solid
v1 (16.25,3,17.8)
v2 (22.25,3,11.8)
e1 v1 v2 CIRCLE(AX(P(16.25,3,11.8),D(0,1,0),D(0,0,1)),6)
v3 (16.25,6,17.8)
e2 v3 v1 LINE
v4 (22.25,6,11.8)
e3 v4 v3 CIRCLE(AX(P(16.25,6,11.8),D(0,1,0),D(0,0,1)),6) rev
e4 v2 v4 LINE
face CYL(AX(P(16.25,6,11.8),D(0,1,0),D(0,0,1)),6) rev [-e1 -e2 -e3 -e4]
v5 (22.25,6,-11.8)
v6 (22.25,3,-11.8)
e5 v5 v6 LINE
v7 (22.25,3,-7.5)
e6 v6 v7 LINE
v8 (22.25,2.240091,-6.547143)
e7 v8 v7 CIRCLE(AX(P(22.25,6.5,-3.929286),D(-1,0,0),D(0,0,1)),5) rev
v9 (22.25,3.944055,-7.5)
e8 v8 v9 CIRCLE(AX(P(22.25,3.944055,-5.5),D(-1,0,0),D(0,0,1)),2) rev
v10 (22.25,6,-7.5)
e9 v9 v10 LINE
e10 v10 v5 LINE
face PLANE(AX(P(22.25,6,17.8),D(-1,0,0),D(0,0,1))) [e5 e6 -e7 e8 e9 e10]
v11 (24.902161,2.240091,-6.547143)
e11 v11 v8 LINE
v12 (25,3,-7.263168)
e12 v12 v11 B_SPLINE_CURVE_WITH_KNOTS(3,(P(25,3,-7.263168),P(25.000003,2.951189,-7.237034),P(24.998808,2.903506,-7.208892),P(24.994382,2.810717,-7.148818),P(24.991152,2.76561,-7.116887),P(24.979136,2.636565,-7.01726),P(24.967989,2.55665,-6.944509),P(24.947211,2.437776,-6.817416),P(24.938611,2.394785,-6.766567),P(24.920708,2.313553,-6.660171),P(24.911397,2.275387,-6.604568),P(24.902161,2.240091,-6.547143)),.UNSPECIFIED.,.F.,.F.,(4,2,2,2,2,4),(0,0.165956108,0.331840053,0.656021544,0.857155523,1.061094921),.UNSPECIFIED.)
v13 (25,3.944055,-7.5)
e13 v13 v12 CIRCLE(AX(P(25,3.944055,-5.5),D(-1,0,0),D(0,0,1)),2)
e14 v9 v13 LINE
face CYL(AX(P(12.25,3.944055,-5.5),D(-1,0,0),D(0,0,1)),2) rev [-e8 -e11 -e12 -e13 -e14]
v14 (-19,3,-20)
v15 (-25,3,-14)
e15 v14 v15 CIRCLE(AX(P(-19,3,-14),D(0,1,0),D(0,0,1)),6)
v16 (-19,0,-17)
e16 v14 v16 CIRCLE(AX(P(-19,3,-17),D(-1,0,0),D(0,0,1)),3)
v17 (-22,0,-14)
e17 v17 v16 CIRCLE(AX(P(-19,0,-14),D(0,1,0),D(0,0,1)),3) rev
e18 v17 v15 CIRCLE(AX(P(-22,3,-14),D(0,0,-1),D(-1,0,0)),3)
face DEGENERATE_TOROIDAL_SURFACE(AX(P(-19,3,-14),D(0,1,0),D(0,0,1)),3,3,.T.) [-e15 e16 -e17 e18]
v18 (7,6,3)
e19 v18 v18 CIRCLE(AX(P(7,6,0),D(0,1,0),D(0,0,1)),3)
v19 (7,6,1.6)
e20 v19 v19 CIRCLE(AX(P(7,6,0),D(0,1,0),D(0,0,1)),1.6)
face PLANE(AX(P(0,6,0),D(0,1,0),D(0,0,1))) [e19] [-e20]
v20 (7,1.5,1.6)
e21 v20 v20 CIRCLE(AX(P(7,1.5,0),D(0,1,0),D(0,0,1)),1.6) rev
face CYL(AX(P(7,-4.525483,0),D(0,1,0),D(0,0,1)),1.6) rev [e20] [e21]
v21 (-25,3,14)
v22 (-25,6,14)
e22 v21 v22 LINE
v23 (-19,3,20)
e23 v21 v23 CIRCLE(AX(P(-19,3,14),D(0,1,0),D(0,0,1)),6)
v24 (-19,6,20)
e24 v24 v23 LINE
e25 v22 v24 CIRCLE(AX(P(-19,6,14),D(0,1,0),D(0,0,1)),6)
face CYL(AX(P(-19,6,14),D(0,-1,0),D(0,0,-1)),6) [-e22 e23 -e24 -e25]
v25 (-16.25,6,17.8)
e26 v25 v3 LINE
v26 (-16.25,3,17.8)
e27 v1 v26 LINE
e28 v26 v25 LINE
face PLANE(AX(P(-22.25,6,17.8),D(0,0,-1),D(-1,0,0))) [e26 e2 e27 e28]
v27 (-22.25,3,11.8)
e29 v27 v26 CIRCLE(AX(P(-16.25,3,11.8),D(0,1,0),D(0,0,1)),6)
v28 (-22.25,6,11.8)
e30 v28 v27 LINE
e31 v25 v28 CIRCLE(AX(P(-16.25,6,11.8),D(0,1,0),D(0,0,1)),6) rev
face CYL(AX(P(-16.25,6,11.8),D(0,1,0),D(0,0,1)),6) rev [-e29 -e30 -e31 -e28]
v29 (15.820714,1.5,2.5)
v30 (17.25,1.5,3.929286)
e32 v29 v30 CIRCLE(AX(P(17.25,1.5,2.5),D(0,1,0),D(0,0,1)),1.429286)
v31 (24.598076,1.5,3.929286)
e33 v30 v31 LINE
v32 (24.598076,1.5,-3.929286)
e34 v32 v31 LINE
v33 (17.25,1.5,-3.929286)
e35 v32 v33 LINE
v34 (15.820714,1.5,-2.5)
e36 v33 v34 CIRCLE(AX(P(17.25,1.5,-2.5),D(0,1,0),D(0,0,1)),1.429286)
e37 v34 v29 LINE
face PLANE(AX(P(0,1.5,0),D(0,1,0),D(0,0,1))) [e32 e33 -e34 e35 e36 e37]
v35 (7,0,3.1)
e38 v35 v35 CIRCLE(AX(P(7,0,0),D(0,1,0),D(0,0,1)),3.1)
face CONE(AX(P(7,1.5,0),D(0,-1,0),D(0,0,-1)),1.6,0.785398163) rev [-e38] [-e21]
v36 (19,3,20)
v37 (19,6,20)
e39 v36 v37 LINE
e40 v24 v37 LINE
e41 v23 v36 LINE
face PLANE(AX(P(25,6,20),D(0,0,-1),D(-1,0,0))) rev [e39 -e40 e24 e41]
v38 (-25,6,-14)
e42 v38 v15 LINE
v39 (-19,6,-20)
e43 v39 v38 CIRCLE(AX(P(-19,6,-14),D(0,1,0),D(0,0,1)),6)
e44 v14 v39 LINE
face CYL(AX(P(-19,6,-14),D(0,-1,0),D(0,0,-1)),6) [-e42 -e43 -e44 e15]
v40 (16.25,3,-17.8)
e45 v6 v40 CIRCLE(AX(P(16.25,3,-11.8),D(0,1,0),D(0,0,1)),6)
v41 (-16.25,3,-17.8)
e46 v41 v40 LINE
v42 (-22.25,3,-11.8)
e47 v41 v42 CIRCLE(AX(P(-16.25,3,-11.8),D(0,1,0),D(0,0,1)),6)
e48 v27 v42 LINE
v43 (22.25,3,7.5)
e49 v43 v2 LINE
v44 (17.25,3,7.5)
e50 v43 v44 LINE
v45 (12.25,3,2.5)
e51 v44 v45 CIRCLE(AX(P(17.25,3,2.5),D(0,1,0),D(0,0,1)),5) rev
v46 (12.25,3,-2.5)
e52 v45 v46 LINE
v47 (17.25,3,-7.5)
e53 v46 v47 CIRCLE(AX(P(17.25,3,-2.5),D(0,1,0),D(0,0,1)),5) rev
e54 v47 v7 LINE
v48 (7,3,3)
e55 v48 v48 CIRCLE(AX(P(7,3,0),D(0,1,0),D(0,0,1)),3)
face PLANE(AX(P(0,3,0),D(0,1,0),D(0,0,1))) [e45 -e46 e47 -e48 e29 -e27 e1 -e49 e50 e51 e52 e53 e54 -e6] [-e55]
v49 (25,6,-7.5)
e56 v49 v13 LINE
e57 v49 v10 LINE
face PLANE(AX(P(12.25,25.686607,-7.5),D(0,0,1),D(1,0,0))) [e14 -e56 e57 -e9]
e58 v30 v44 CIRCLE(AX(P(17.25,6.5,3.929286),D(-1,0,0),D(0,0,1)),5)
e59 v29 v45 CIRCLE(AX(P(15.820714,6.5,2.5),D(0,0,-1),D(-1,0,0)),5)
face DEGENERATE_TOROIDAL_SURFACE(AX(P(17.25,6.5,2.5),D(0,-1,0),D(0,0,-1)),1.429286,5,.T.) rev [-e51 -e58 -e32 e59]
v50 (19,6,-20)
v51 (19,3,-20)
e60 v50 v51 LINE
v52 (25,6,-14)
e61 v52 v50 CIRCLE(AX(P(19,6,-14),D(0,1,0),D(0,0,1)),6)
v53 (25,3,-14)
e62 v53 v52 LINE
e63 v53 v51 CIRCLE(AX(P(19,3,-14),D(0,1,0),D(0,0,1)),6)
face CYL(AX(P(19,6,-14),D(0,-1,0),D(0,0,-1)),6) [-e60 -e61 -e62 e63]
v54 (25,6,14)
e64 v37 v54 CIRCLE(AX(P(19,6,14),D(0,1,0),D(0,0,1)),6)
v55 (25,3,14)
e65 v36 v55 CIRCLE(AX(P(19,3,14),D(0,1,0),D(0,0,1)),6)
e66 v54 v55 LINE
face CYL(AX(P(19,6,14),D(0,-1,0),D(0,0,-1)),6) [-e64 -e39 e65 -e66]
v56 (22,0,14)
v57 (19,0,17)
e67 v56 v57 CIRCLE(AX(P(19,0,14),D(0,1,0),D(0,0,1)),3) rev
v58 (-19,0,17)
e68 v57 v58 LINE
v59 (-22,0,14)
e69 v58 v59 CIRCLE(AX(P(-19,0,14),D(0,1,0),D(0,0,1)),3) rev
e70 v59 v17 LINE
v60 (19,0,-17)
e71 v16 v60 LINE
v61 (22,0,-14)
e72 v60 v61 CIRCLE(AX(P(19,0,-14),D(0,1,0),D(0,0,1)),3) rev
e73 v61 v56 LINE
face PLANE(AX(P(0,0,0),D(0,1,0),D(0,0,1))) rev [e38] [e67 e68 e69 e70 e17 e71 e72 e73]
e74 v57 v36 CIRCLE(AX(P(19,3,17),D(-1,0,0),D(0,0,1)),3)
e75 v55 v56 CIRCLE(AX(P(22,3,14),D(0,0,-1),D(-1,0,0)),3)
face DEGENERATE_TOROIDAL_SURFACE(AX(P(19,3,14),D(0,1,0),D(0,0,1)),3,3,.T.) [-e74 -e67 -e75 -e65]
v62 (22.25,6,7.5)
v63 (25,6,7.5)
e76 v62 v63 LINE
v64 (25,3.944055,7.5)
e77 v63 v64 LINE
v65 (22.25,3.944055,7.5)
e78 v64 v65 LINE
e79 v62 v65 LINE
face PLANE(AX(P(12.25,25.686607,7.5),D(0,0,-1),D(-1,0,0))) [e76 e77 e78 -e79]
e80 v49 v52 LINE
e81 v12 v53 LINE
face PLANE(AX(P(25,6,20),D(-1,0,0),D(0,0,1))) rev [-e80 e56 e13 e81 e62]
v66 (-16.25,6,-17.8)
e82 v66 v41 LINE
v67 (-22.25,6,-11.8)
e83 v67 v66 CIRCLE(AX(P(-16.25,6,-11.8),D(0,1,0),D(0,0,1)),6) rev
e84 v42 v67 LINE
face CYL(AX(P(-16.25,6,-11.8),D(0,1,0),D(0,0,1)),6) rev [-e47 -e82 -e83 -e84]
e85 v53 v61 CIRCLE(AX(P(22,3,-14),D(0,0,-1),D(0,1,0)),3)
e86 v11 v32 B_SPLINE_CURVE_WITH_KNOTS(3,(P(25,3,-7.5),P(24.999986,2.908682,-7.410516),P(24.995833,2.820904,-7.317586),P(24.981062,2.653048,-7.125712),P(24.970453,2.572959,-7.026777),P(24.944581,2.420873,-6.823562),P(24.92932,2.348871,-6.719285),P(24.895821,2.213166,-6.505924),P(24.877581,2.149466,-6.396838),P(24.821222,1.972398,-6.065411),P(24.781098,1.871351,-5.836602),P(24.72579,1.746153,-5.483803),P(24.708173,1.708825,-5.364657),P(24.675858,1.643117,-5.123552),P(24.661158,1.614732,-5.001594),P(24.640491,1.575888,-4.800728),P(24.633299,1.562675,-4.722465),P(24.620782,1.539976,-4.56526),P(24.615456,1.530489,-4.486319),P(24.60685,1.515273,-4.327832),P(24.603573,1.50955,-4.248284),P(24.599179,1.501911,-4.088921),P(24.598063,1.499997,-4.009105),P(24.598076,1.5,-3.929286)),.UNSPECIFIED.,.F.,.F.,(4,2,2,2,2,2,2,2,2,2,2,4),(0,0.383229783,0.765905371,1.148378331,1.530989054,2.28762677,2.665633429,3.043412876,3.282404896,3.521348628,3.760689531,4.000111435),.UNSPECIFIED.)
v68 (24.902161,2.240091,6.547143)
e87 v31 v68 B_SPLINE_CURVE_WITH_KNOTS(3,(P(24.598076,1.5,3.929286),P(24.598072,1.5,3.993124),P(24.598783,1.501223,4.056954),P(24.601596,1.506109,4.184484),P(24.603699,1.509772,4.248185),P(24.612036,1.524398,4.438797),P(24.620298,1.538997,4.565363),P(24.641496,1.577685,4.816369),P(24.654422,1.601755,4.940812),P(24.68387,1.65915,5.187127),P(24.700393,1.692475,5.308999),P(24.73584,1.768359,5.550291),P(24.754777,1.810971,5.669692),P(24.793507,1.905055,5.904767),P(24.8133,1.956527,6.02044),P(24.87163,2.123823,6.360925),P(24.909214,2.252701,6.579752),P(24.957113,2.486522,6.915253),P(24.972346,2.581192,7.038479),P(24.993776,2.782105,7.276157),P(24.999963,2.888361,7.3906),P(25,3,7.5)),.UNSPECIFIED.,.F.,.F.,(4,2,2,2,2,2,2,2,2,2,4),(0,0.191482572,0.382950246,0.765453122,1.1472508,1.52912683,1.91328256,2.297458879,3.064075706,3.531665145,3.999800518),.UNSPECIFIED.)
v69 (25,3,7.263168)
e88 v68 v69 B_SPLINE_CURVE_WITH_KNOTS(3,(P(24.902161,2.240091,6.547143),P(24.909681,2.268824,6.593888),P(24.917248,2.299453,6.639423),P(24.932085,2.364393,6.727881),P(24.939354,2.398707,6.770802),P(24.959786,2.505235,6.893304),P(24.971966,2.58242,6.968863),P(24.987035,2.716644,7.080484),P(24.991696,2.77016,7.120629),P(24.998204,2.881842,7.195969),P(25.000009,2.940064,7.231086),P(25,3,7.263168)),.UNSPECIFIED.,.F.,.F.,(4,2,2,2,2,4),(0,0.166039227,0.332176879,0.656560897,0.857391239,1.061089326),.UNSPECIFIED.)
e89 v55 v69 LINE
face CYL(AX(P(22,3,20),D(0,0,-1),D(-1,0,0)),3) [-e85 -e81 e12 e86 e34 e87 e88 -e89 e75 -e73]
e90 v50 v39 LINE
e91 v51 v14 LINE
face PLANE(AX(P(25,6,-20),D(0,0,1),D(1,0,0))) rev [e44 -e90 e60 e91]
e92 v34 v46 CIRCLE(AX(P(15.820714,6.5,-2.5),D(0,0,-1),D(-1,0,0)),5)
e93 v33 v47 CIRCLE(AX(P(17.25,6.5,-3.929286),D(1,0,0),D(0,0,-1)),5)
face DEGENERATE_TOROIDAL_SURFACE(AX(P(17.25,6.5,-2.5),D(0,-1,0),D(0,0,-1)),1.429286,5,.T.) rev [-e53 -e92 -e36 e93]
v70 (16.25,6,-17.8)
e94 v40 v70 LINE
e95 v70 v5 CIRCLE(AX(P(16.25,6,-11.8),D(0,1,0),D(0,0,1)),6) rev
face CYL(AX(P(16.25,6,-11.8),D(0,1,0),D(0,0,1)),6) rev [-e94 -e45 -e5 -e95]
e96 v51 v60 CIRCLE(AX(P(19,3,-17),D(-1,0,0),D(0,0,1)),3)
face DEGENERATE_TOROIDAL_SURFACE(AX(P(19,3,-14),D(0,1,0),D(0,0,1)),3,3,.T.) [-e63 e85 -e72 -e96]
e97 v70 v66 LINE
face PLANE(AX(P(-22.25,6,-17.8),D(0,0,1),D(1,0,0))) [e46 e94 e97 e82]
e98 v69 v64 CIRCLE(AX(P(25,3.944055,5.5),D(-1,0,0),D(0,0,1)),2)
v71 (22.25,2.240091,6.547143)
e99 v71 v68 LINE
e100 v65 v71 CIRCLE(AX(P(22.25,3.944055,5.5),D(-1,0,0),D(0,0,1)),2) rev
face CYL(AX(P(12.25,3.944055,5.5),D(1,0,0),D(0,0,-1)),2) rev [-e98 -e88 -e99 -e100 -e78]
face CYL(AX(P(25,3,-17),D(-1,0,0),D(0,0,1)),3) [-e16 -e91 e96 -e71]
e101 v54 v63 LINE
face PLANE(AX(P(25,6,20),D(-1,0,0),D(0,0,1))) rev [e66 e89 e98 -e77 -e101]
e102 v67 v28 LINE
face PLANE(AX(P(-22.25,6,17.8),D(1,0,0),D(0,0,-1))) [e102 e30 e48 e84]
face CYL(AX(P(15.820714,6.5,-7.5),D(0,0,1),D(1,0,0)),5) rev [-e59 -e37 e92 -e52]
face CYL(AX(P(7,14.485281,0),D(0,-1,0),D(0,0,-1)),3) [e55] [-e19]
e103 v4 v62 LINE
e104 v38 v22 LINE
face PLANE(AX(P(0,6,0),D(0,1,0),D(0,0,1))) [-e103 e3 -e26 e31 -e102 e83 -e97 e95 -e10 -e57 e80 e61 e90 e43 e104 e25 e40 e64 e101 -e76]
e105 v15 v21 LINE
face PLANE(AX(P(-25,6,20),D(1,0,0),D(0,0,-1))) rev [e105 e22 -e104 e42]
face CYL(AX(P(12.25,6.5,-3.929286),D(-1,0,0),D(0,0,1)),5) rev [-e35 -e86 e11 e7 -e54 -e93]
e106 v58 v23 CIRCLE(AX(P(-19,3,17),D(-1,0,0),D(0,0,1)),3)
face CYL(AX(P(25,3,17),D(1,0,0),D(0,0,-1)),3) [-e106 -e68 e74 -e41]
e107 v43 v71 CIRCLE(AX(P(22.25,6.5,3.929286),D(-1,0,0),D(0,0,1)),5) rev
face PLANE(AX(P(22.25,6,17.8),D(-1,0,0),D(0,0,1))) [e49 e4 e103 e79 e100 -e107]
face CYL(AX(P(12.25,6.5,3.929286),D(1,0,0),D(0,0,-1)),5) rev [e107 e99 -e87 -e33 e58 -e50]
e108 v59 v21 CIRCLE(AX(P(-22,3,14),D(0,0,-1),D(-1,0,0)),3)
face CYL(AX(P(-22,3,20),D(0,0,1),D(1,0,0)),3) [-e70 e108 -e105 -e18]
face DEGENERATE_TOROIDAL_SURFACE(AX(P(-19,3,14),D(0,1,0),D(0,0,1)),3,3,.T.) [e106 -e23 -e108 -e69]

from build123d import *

# Parameters (mm, degrees)
SKETCH1_W           = 50
SKETCH1_H           = 40
SKETCH1_W_2         = 44.5
SKETCH1_H_2         = 35.6
BOSS_EXTRUDE1_DEPTH = 6
SKETCH2_W           = 44.5
SKETCH2_H           = 35.6
BOSS_EXTRUDE2_DEPTH = 3
SKETCH3_R           = 3
BOSS_EXTRUDE3_DEPTH = 3
SKETCH4_R           = 1.6
CUT_EXTRUDE1_DEPTH  = 6
FILLET1_R           = 6
CHAMFER1_SIZE       = 1.5
FILLET2_R           = 3
CUT_EXTRUDE2_START  = -1.5
SKETCH5_W           = 12.75
SKETCH5_H           = 15
CUT_EXTRUDE2_DEPTH  = 4.5
FILLET3_R           = 5
FILLET4_R           = 5
FILLET5_R           = 2


with BuildPart() as part:
    # Sketch1 → Boss-Extrude1 (new body)
    with BuildSketch(Plane(origin=(0, 0, 0), x_dir=(1, 0, 0), z_dir=(0, 1, 0))):
        Rectangle(SKETCH1_W, SKETCH1_H)
        Rectangle(SKETCH1_W_2, SKETCH1_H_2, mode=Mode.SUBTRACT)
    extrude(amount=BOSS_EXTRUDE1_DEPTH)

    # Sketch2 → Boss-Extrude2 (add)
    with BuildSketch(Plane(origin=(0, 0, 0), x_dir=(-1, 0, 0), z_dir=(0, -1, 0))):
        Rectangle(SKETCH2_W, SKETCH2_H)
    extrude(amount=-BOSS_EXTRUDE2_DEPTH)

    # Sketch3 → Boss-Extrude3 (add)
    with BuildSketch(Plane(origin=(0, 3, 0), x_dir=(1, 0, 0), z_dir=(0, 1, 0))):
        with Locations(Location((7, 0, 0), (0, 0, 270))):
            Circle(SKETCH3_R)
    extrude(amount=BOSS_EXTRUDE3_DEPTH)

    # Sketch4 → Cut-Extrude1 (cut)
    with BuildSketch(Plane(origin=(0, 6, 0), x_dir=(1, 0, 0), z_dir=(0, 1, 0))):
        with Locations(Location((7, 0, 0), (0, 0, 270))):
            Circle(SKETCH4_R)
    extrude(amount=-CUT_EXTRUDE1_DEPTH, mode=Mode.SUBTRACT)

    # Fillet1
    fillet1_edges = [part.edges().sort_by_distance(p)[0] for p in [
        (22.25, 4.5, 17.8),
        (22.25, 4.5, -17.8),
        (-22.25, 4.5, -17.8),
        (-22.25, 4.5, 17.8),
        (-25, 3, -20),
        (25, 3, -20),
        (25, 3, 20),
        (-25, 3, 20),
    ]]
    fillet(fillet1_edges, radius=FILLET1_R)

    # Chamfer1
    chamfer1_edges = [part.edges().sort_by_distance(p)[0] for p in [
        (7, 0, -1.6),
    ]]
    chamfer(chamfer1_edges, length=CHAMFER1_SIZE)

    # Fillet2
    fillet2_edges = [part.edges().sort_by_distance(p)[0] for p in [
        (-25, 0, 0),
        (0, 0, -20),
        (25, 0, 0),
        (0, 0, 20),
        (23.242640687, 0, -18.242640687),
        (23.242640687, 0, 18.242640687),
        (-23.242640687, 0, 18.242640687),
        (-23.242640687, 0, -18.242640687),
    ]]
    fillet(fillet2_edges, radius=FILLET2_R)

    # Sketch5 → Cut-Extrude2 (cut)
    with BuildSketch(Plane(origin=(0, 3, 0), x_dir=(1, 0, 0), z_dir=(0, 1, 0)).offset(CUT_EXTRUDE2_START)):
        with Locations((18.625, 0)):
            Rectangle(SKETCH5_W, SKETCH5_H)
    extrude(amount=CUT_EXTRUDE2_DEPTH, mode=Mode.SUBTRACT)

    # Fillet3
    fillet3_edges = [part.edges().sort_by_distance(p)[0] for p in [
        (12.25, 2.25, -7.5),
        (12.25, 2.25, 7.5),
    ]]
    fillet(fillet3_edges, radius=FILLET3_R)

    # Fillet4
    # the kernel refuses this fillet: 5 mm, written as the material it adds along each edge
    with BuildSketch(Plane(origin=(33.524861747, 1.5, 7.5), x_dir=(0, 1, 0), z_dir=(-1, 0, 0))) as fillet4_piece_1_section:
        with BuildLine():
            CenterArc((5, 3.570714214), FILLET4_R, 180, 45.572995999)
            Line((0, 3.570714214), (-0.1, 3.570714214))
            Line((-0.1, 3.570714214), (-0.1, 0))
            Line((-0.1, 0), (0, -0.1))
            ThreePointArc((0, -0.1), (0.75, -0.1), (1.43, -0.071414284))
            Line((1.43, -0.071414284), (1.5, 0))
        make_face()
    fillet4_piece_1 = extrude(amount=16.274861747, mode=Mode.PRIVATE)
    fillet4_piece_1 = fillet4_piece_1 & Plane(origin=(22, 3, 6.572740675), x_dir=(0, -1, 0), z_dir=(0, 0, 1)) * Cylinder(3, 47, mode=Mode.PRIVATE)
    fillet4_piece_1 = split(fillet4_piece_1, bisect_by=Plane(origin=(22.25, 1.89059937, 6.572740675), z_dir=(1, 0, 0)), keep=Keep.TOP, mode=Mode.PRIVATE)
    add(fillet4_piece_1)
    with BuildSketch(Plane(origin=(33.524861747, 1.5, 7.5), x_dir=(0, 1, 0), z_dir=(-1, 0, 0))) as fillet4_piece_2_section:
        with BuildLine():
            CenterArc((5, 3.570714214), FILLET4_R, 180, 45.572995999)
            Line((0, 3.570714214), (-0.1, 3.570714214))
            Line((-0.1, 3.570714214), (-0.1, 0))
            Line((-0.1, 0), (0, -0.1))
            ThreePointArc((0, -0.1), (0.75, -0.1), (1.43, -0.071414284))
            Line((1.43, -0.071414284), (1.5, 0))
        make_face()
    fillet4_piece_2 = extrude(amount=16.274861747, mode=Mode.PRIVATE)
    fillet4_piece_2 = fillet4_piece_2 & Plane(origin=(22, 3, 6.568122806), x_dir=(0, -1, 0), z_dir=(0, 0, 1)) * Cylinder(3, 47, mode=Mode.PRIVATE)
    fillet4_piece_2 = split(fillet4_piece_2, bisect_by=Plane(origin=(22.25, 1.887314872, 6.568122806), z_dir=(-1, 0, 0)), keep=Keep.TOP, mode=Mode.PRIVATE)
    add(fillet4_piece_2)
    with BuildSketch(Plane(origin=(33.524861747, 1.5, 7.5), x_dir=(0, 1, 0), z_dir=(-1, 0, 0))) as fillet4_piece_3_section:
        with BuildLine():
            CenterArc((5, 3.570714214), FILLET4_R, 180, 45.572995999)
            Line((0, 3.570714214), (-0.1, 3.570714214))
            Line((-0.1, 3.570714214), (-0.1, 0))
            Line((-0.1, 0), (0, -0.1))
            ThreePointArc((0, -0.1), (0.75, -0.1), (1.43, -0.071414284))
            Line((1.43, -0.071414284), (1.5, 0))
        make_face()
    fillet4_piece_3 = extrude(amount=16.274861747, mode=Mode.PRIVATE)
    fillet4_piece_3 = fillet4_piece_3 - Plane(origin=(22, 3, 6.51033781), x_dir=(0, -1, 0), z_dir=(0, 0, 1)) * Cylinder(3, 47, mode=Mode.PRIVATE)
    fillet4_piece_3 = split(fillet4_piece_3, bisect_by=Plane(origin=(22.25, 1.84623237, 6.51033781), z_dir=(-1, 0, 0)), keep=Keep.TOP, mode=Mode.PRIVATE)
    add(fillet4_piece_3)
    with BuildSketch(Plane(origin=(17.25, 1.5, 2.5), x_dir=(0, 0, 1), z_dir=(1, 0, 0))) as fillet4_piece_4:
        with BuildLine():
            CenterArc((1.429285786, -5), FILLET4_R, 44.427004001, 45.572995999)
            Line((5, -1.5), (5.071414284, -1.43))
            ThreePointArc((5.071414284, -1.43), (5.1, -0.75), (5.1, 0))
            Line((5.1, 0), (5, 0.1))
            Line((5, 0.1), (1.429285786, 0.1))
            Line((1.429285786, 0.1), (1.429285786, 0))
        make_face()
    revolve(axis=Axis((17.25, 1.5, 2.5), (0, -1, 0)), revolution_arc=90)
    with BuildSketch(Plane(origin=(12.25, 1.5, 2.5), x_dir=(1, 0, 0), z_dir=(0, 0, -1))) as fillet4_piece_5:
        with BuildLine():
            CenterArc((3.570714214, -5), FILLET4_R, 90, 45.572995999)
            Line((0, -1.5), (-0.071414284, -1.43))
            ThreePointArc((-0.071414284, -1.43), (-0.1, -0.75), (-0.1, 0))
            Line((-0.1, 0), (0, 0.1))
            Line((0, 0.1), (3.570714214, 0.1))
            Line((3.570714214, 0.1), (3.570714214, 0))
        make_face()
    extrude(amount=5)
    with BuildSketch(Plane(origin=(17.25, 1.5, -2.5), x_dir=(0, 0, -1), z_dir=(1, 0, 0))) as fillet4_piece_6:
        with BuildLine():
            CenterArc((1.429285786, 5), FILLET4_R, 270, 45.572995999)
            Line((5, 1.5), (5.071414284, 1.43))
            ThreePointArc((5.071414284, 1.43), (5.1, 0.75), (5.1, 0))
            Line((5.1, 0), (5, -0.1))
            Line((5, -0.1), (1.429285786, -0.1))
            Line((1.429285786, -0.1), (1.429285786, 0))
        make_face()
    revolve(axis=Axis((17.25, 1.5, -2.5), (0, 1, 0)), revolution_arc=90)
    with BuildSketch(Plane(origin=(17.25, 1.5, -7.5), x_dir=(0, 0, 1), z_dir=(1, 0, 0))) as fillet4_piece_7_section:
        with BuildLine():
            CenterArc((3.570714214, -5), FILLET4_R, 90, 45.572995999)
            Line((0, -1.5), (-0.071414284, -1.43))
            ThreePointArc((-0.071414284, -1.43), (-0.1, -0.75), (-0.1, 0))
            Line((-0.1, 0), (0, 0.1))
            Line((0, 0.1), (3.570714214, 0.1))
            Line((3.570714214, 0.1), (3.570714214, 0))
        make_face()
    fillet4_piece_7 = extrude(amount=16.274861747, mode=Mode.PRIVATE)
    fillet4_piece_7 = fillet4_piece_7 - Plane(origin=(22, 3, -6.510337786), x_dir=(0, -1, 0), z_dir=(0, 0, 1)) * Cylinder(3, 47, mode=Mode.PRIVATE)
    fillet4_piece_7 = split(fillet4_piece_7, bisect_by=Plane(origin=(22.25, 1.846232349, -6.510337786), z_dir=(-1, 0, 0)), keep=Keep.TOP, mode=Mode.PRIVATE)
    add(fillet4_piece_7)
    with BuildSketch(Plane(origin=(17.25, 1.5, -7.5), x_dir=(0, 0, 1), z_dir=(1, 0, 0))) as fillet4_piece_8_section:
        with BuildLine():
            CenterArc((3.570714214, -5), FILLET4_R, 90, 45.572995999)
            Line((0, -1.5), (-0.071414284, -1.43))
            ThreePointArc((-0.071414284, -1.43), (-0.1, -0.75), (-0.1, 0))
            Line((-0.1, 0), (0, 0.1))
            Line((0, 0.1), (3.570714214, 0.1))
            Line((3.570714214, 0.1), (3.570714214, 0))
        make_face()
    fillet4_piece_8 = extrude(amount=16.274861747, mode=Mode.PRIVATE)
    fillet4_piece_8 = fillet4_piece_8 & Plane(origin=(22, 3, -6.568122817), x_dir=(0, -1, 0), z_dir=(0, 0, 1)) * Cylinder(3, 47, mode=Mode.PRIVATE)
    fillet4_piece_8 = split(fillet4_piece_8, bisect_by=Plane(origin=(22.25, 1.887314882, -6.568122817), z_dir=(-1, 0, 0)), keep=Keep.TOP, mode=Mode.PRIVATE)
    add(fillet4_piece_8)
    with BuildSketch(Plane(origin=(17.25, 1.5, -7.5), x_dir=(0, 0, 1), z_dir=(1, 0, 0))) as fillet4_piece_9_section:
        with BuildLine():
            CenterArc((3.570714214, -5), FILLET4_R, 90, 45.572995999)
            Line((0, -1.5), (-0.071414284, -1.43))
            ThreePointArc((-0.071414284, -1.43), (-0.1, -0.75), (-0.1, 0))
            Line((-0.1, 0), (0, 0.1))
            Line((0, 0.1), (3.570714214, 0.1))
            Line((3.570714214, 0.1), (3.570714214, 0))
        make_face()
    fillet4_piece_9 = extrude(amount=16.274861747, mode=Mode.PRIVATE)
    fillet4_piece_9 = fillet4_piece_9 & Plane(origin=(22, 3, -6.572740691), x_dir=(0, -1, 0), z_dir=(0, 0, 1)) * Cylinder(3, 47, mode=Mode.PRIVATE)
    fillet4_piece_9 = split(fillet4_piece_9, bisect_by=Plane(origin=(22.25, 1.890599382, -6.572740691), z_dir=(1, 0, 0)), keep=Keep.TOP, mode=Mode.PRIVATE)
    add(fillet4_piece_9)

    # Fillet5
    # the kernel refuses this fillet: 2 mm, written as the material it adds along each edge
    with BuildSketch(Plane(origin=(25, 3, 7.5), x_dir=(0, 1, 0), z_dir=(-1, 0, 0))) as fillet5_piece_1_section:
        with BuildLine():
            CenterArc((0.944054606, 2), FILLET5_R, 211.572120622, 58.427879378)
            ThreePointArc((-0.75990899, 0.95285719), (-0.409095943, 0.453188126), (0, 0))
            Line((0, 0), (0.944054606, 0))
        make_face()
    fillet5_piece_1 = extrude(amount=2.75, mode=Mode.PRIVATE)
    fillet5_piece_1 = split(fillet5_piece_1, bisect_by=Plane(origin=(24.978634631, 3, 7.467226541), z_dir=(0, 1, 0)), keep=Keep.TOP, mode=Mode.PRIVATE)
    add(fillet5_piece_1)
    with BuildSketch(Plane(origin=(28.046923139, 3, 7.5), x_dir=(0, 1, 0), z_dir=(-1, 0, 0))) as fillet5_piece_2_section:
        with BuildLine():
            CenterArc((0.944054606, 2), FILLET5_R, 211.572120622, 58.427879378)
            ThreePointArc((-0.75990899, 0.95285719), (-0.409095943, 0.453188126), (0, 0))
            Line((0, 0), (0.944054606, 0))
        make_face()
    fillet5_piece_2 = extrude(amount=5.796923139, mode=Mode.PRIVATE)
    fillet5_piece_2 = fillet5_piece_2 & Plane(origin=(22, 3, 7.194507962), x_dir=(0, -1, 0), z_dir=(0, 0, 1)) * Cylinder(3, 16, mode=Mode.PRIVATE)
    add(fillet5_piece_2)
    with BuildSketch(Plane(origin=(22.25, 3, -7.5), x_dir=(0, -0.6235052176328177, 0.7818191885497904), z_dir=(1, 0, 0))) as fillet5_piece_3_section:
        with BuildLine():
            CenterArc((0.975015405, -1.985090441), FILLET5_R, 82.999562312, 58.427879378)
            Line((-0.588622973, -0.738080006), (0, 0))
            ThreePointArc((0, 0), (0.609384628, 0.037273897), (1.218769256, 0))
        make_face()
    fillet5_piece_3 = extrude(amount=5.796923139, mode=Mode.PRIVATE)
    fillet5_piece_3 = fillet5_piece_3 & Plane(origin=(22, 3, -7.194507962), x_dir=(0, -1, 0), z_dir=(0, 0, 1)) * Cylinder(3, 17, mode=Mode.PRIVATE)
    add(fillet5_piece_3)
    with BuildSketch(Plane(origin=(22.25, 3, -7.5), x_dir=(0, -0.6235052176328177, 0.7818191885497904), z_dir=(1, 0, 0))) as fillet5_piece_4_section:
        with BuildLine():
            CenterArc((0.975015405, -1.985090441), FILLET5_R, 82.999562312, 58.427879378)
            Line((-0.588622973, -0.738080006), (0, 0))
            ThreePointArc((0, 0), (0.609384628, 0.037273897), (1.218769256, 0))
        make_face()
    fillet5_piece_4 = extrude(amount=2.75, mode=Mode.PRIVATE)
    fillet5_piece_4 = split(fillet5_piece_4, bisect_by=Plane(origin=(24.978634649, 3, -7.467226583), z_dir=(0, 1, 0)), keep=Keep.TOP, mode=Mode.PRIVATE)
    add(fillet5_piece_4)


solid = part.part
